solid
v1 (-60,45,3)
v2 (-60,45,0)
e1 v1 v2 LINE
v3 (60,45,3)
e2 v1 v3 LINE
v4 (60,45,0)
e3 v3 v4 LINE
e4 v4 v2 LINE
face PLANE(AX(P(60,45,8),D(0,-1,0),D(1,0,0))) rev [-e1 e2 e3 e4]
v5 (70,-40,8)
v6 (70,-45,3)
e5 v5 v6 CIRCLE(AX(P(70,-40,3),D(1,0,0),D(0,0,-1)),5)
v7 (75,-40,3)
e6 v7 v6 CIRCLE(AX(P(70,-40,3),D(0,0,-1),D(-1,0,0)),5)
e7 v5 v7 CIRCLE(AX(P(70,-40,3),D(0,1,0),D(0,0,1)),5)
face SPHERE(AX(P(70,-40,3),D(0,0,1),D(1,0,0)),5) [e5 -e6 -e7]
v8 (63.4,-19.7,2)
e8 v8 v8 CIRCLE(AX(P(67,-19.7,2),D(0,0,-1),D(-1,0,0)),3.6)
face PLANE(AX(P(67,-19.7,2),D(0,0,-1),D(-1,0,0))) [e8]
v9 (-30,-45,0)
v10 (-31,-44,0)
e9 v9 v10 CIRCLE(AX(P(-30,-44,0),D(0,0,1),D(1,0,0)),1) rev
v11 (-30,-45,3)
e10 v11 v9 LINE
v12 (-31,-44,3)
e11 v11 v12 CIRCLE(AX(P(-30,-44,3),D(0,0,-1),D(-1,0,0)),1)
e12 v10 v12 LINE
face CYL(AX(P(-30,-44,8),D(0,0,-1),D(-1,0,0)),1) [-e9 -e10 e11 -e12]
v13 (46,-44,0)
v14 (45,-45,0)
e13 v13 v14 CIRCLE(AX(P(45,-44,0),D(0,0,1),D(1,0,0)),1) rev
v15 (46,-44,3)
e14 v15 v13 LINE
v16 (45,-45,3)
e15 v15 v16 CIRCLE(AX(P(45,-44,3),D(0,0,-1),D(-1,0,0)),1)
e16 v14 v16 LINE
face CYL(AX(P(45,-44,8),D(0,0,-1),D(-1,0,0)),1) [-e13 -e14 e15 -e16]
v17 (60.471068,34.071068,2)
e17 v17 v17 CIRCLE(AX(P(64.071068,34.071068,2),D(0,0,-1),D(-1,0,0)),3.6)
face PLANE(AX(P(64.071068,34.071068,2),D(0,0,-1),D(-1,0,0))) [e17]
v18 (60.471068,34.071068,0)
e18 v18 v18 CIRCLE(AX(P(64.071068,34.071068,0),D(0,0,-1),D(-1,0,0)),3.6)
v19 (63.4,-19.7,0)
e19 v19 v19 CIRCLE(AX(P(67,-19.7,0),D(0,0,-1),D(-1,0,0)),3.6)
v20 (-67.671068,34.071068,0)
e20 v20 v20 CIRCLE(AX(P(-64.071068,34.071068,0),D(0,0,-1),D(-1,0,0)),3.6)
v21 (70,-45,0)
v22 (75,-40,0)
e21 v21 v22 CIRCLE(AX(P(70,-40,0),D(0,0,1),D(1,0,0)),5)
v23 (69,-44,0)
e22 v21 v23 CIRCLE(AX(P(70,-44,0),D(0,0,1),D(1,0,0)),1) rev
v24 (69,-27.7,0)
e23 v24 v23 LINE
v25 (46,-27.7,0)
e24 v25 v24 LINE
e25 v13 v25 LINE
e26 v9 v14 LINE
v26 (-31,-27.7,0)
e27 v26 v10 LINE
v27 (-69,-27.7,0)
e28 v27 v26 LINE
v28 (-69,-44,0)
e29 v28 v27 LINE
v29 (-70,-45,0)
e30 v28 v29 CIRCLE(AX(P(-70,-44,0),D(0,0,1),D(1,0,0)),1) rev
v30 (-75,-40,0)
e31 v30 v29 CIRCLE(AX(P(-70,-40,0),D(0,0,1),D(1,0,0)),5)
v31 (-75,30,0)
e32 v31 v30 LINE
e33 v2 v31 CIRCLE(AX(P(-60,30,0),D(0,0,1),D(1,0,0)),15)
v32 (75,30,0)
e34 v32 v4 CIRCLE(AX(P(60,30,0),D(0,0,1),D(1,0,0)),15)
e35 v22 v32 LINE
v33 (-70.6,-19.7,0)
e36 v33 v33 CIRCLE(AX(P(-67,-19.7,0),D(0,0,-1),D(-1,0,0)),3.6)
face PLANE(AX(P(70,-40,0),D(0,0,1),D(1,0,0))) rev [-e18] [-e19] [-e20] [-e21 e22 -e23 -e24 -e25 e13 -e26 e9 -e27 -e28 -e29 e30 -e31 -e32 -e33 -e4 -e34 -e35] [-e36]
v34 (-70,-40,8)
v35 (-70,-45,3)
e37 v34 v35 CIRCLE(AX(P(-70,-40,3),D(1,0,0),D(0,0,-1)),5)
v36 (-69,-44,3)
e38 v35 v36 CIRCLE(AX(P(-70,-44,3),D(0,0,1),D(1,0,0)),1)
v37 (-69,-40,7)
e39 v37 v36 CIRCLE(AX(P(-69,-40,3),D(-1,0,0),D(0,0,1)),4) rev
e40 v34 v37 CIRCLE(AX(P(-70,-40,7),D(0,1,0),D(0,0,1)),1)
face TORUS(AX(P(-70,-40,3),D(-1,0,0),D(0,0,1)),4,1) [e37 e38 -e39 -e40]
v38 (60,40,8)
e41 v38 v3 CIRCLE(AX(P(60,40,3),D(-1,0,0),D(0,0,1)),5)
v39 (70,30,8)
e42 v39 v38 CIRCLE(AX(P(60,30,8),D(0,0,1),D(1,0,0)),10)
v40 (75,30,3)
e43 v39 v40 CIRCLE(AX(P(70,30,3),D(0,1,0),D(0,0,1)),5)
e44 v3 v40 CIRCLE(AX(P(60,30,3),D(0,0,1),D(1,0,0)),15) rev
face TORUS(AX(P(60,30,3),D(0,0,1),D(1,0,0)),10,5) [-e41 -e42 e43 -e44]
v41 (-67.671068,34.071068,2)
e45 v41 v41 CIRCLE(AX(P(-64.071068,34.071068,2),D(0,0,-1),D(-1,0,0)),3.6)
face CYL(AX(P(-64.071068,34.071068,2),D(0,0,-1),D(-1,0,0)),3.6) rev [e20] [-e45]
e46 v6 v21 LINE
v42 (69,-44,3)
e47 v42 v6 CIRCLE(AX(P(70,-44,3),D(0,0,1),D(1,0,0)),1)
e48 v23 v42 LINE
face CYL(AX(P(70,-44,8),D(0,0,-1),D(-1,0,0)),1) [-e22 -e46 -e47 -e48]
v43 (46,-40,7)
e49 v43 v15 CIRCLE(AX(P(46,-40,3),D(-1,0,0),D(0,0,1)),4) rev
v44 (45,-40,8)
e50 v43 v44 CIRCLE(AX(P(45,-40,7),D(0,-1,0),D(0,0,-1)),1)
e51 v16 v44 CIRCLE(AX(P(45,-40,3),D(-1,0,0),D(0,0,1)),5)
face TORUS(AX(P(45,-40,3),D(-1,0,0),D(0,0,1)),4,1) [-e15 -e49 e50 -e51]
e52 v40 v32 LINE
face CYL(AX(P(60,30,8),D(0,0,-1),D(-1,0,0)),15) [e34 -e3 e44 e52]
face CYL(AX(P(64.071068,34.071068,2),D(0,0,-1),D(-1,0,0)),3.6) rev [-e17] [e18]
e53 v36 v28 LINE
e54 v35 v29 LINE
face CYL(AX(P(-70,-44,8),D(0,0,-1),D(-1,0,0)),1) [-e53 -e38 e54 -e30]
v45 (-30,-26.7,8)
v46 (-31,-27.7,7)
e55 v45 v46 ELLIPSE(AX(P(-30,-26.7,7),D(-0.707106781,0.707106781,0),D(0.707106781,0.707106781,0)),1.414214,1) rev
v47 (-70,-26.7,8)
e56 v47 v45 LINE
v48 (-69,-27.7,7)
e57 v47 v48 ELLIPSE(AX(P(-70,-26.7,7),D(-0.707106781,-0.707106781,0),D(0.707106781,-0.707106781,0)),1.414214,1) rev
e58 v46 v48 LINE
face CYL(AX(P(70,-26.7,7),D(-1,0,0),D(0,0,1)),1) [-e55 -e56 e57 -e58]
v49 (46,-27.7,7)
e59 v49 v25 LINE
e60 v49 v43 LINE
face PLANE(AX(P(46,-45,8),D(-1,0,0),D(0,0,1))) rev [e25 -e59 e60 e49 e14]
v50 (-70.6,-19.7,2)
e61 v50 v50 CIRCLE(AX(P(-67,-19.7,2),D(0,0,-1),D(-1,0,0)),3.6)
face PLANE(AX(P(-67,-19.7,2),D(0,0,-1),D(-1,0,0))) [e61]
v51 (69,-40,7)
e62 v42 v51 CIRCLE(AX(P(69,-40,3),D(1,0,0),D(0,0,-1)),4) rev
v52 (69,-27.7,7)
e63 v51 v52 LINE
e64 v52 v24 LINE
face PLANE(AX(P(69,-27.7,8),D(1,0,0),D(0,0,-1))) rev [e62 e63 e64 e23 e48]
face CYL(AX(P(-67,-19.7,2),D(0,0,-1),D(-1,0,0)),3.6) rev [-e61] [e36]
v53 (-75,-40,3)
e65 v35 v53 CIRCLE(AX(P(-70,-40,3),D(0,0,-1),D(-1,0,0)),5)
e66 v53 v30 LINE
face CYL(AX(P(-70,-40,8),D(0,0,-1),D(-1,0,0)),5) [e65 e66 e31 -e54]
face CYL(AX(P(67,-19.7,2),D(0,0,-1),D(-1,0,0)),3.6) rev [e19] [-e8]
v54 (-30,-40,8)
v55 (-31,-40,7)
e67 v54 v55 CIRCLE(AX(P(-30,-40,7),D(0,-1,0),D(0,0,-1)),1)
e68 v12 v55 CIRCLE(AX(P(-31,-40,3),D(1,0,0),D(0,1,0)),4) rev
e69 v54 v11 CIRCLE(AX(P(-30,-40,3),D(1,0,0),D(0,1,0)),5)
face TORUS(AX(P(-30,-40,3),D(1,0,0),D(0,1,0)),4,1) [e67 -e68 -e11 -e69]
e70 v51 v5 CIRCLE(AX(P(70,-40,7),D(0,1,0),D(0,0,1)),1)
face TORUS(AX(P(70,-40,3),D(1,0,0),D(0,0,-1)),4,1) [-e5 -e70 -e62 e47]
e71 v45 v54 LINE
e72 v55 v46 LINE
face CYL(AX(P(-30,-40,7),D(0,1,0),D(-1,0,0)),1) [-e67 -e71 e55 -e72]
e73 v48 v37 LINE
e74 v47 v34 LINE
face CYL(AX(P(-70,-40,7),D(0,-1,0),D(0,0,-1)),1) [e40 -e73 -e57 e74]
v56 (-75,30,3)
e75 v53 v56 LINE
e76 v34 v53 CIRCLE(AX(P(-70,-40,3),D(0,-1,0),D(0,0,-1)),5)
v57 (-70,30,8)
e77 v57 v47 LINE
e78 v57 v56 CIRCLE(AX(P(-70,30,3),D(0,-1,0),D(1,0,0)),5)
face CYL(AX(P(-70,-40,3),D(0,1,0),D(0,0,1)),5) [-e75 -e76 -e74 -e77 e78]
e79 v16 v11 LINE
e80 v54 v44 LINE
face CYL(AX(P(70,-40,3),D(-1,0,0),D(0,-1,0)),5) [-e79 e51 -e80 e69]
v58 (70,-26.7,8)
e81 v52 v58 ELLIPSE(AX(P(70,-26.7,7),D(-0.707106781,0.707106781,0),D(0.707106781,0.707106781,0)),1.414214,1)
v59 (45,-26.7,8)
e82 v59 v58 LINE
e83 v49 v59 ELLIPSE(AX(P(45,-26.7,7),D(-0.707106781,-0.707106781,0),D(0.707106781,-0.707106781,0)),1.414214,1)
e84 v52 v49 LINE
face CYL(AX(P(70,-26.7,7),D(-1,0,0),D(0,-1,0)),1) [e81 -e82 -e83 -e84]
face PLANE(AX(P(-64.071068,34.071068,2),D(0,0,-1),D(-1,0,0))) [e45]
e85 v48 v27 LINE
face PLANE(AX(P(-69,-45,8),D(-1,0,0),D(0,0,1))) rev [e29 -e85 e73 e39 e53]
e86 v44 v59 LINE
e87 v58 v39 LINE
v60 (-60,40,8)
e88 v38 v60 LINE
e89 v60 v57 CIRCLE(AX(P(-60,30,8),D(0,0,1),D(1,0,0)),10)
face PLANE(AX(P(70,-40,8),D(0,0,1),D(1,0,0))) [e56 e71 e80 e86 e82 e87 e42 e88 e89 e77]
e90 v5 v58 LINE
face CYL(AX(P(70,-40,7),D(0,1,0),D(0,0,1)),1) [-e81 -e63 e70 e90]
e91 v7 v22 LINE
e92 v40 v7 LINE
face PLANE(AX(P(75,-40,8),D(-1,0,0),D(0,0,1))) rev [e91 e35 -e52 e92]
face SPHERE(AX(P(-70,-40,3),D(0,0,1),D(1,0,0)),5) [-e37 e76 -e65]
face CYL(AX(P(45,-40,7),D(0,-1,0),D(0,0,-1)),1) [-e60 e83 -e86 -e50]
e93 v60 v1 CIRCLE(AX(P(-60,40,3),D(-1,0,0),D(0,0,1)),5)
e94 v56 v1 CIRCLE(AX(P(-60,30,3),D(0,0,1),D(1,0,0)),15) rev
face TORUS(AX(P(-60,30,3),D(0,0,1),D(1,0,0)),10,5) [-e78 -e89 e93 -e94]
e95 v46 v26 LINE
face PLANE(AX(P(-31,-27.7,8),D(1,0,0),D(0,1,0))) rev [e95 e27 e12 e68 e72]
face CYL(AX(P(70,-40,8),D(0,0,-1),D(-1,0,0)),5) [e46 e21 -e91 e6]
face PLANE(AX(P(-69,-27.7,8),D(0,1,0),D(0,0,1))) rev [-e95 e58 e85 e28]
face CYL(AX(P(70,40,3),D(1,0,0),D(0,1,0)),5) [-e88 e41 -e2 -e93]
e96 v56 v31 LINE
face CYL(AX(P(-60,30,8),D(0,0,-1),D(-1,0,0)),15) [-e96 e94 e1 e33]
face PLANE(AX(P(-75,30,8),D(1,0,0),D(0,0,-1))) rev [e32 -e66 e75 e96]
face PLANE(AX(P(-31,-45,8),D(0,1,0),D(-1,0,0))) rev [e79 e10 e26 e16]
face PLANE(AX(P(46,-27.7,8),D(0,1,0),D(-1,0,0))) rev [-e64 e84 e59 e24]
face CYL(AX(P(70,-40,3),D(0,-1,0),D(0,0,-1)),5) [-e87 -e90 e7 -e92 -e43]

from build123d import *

# Parameters (mm, degrees)
SALIENTE_EXTRUIR1_DEPTH = 8
REDONDEO1_R             = 5
REDONDEO2_R             = 5
REDONDEO3_R             = 1
CROQUIS2_R              = 3.6
CORTAR_EXTRUIR1_DEPTH   = 2


with BuildPart() as part:
    # Croquis1 → Saliente-Extruir1 (new body)
    with BuildSketch(Plane.XY):
        with BuildLine():
            Line((69, -45), (70, -45))
            ThreePointArc((70, -45), (73.535533906, -43.535533906), (75, -40))
            Line((75, -40), (75, 30))
            ThreePointArc((75, 30), (70.606601718, 40.606601718), (60, 45))
            Line((60, 45), (-60, 45))
            ThreePointArc((-60, 45), (-70.606601718, 40.606601718), (-75, 30))
            Line((-75, 30), (-75, -40))
            ThreePointArc((-75, -40), (-73.535533906, -43.535533906), (-70, -45))
            Line((-70, -45), (-69, -45))
            Line((-69, -45), (-69, -27.7))
            Line((-69, -27.7), (-31, -27.7))
            Line((-31, -27.7), (-31, -45))
            Line((-31, -45), (46, -45))
            Line((46, -45), (46, -27.7))
            Line((46, -27.7), (69, -27.7))
            Line((69, -27.7), (69, -45))
        make_face()
    extrude(amount=SALIENTE_EXTRUIR1_DEPTH)

    # Redondeo1
    redondeo1_edges = [part.edges().sort_by_distance(p)[0] for p in [
        (73.535533906, -43.535533906, 8),
        (75, -5, 8),
        (70.606601718, 40.606601718, 8),
        (0, 45, 8),
        (-70.606601718, 40.606601718, 8),
        (-75, -5, 8),
        (-73.535533906, -43.535533906, 8),
        (-69.5, -45, 8),
        (69.5, -45, 8),
    ]]
    fillet(redondeo1_edges, radius=REDONDEO1_R)

    # Redondeo2
    redondeo2_edges = [part.edges().sort_by_distance(p)[0] for p in [
        (7.5, -45, 8),
    ]]
    fillet(redondeo2_edges, radius=REDONDEO2_R)

    # Redondeo3
    redondeo3_edges = [part.edges().sort_by_distance(p)[0] for p in [
        (-69, -33.85, 8),
        (-50, -27.7, 8),
        (69, -33.85, 8),
        (69, -45, 1.5),
        (69, -43.535533906, 6.535533906),
        (-31, -33.85, 8),
        (-69, -45, 1.5),
        (-69, -43.535533906, 6.535533906),
        (57.5, -27.7, 8),
        (46, -33.85, 8),
        (46, -45, 1.5),
        (-31, -45, 1.5),
        (-31, -43.535533906, 6.535533906),
        (46, -43.535533906, 6.535533906),
    ]]
    fillet(redondeo3_edges, radius=REDONDEO3_R - 0.0001)  # a hair under: the kernel refuses the full size

    # Croquis2 → Cortar-Extruir1 (cut)
    with BuildSketch(Plane(origin=(0, 0, 0), x_dir=(-1, 0, 0), z_dir=(0, 0, -1))):
        with Locations((67, -19.7)):
            Circle(CROQUIS2_R)
        with Locations((64.071067812, 34.071067812)):
            Circle(CROQUIS2_R)
        with Locations((-67, -19.7)):
            Circle(CROQUIS2_R)
        with Locations((-64.071067812, 34.071067812)):
            Circle(CROQUIS2_R)
    extrude(amount=-CORTAR_EXTRUIR1_DEPTH, mode=Mode.SUBTRACT)


solid = part.part
